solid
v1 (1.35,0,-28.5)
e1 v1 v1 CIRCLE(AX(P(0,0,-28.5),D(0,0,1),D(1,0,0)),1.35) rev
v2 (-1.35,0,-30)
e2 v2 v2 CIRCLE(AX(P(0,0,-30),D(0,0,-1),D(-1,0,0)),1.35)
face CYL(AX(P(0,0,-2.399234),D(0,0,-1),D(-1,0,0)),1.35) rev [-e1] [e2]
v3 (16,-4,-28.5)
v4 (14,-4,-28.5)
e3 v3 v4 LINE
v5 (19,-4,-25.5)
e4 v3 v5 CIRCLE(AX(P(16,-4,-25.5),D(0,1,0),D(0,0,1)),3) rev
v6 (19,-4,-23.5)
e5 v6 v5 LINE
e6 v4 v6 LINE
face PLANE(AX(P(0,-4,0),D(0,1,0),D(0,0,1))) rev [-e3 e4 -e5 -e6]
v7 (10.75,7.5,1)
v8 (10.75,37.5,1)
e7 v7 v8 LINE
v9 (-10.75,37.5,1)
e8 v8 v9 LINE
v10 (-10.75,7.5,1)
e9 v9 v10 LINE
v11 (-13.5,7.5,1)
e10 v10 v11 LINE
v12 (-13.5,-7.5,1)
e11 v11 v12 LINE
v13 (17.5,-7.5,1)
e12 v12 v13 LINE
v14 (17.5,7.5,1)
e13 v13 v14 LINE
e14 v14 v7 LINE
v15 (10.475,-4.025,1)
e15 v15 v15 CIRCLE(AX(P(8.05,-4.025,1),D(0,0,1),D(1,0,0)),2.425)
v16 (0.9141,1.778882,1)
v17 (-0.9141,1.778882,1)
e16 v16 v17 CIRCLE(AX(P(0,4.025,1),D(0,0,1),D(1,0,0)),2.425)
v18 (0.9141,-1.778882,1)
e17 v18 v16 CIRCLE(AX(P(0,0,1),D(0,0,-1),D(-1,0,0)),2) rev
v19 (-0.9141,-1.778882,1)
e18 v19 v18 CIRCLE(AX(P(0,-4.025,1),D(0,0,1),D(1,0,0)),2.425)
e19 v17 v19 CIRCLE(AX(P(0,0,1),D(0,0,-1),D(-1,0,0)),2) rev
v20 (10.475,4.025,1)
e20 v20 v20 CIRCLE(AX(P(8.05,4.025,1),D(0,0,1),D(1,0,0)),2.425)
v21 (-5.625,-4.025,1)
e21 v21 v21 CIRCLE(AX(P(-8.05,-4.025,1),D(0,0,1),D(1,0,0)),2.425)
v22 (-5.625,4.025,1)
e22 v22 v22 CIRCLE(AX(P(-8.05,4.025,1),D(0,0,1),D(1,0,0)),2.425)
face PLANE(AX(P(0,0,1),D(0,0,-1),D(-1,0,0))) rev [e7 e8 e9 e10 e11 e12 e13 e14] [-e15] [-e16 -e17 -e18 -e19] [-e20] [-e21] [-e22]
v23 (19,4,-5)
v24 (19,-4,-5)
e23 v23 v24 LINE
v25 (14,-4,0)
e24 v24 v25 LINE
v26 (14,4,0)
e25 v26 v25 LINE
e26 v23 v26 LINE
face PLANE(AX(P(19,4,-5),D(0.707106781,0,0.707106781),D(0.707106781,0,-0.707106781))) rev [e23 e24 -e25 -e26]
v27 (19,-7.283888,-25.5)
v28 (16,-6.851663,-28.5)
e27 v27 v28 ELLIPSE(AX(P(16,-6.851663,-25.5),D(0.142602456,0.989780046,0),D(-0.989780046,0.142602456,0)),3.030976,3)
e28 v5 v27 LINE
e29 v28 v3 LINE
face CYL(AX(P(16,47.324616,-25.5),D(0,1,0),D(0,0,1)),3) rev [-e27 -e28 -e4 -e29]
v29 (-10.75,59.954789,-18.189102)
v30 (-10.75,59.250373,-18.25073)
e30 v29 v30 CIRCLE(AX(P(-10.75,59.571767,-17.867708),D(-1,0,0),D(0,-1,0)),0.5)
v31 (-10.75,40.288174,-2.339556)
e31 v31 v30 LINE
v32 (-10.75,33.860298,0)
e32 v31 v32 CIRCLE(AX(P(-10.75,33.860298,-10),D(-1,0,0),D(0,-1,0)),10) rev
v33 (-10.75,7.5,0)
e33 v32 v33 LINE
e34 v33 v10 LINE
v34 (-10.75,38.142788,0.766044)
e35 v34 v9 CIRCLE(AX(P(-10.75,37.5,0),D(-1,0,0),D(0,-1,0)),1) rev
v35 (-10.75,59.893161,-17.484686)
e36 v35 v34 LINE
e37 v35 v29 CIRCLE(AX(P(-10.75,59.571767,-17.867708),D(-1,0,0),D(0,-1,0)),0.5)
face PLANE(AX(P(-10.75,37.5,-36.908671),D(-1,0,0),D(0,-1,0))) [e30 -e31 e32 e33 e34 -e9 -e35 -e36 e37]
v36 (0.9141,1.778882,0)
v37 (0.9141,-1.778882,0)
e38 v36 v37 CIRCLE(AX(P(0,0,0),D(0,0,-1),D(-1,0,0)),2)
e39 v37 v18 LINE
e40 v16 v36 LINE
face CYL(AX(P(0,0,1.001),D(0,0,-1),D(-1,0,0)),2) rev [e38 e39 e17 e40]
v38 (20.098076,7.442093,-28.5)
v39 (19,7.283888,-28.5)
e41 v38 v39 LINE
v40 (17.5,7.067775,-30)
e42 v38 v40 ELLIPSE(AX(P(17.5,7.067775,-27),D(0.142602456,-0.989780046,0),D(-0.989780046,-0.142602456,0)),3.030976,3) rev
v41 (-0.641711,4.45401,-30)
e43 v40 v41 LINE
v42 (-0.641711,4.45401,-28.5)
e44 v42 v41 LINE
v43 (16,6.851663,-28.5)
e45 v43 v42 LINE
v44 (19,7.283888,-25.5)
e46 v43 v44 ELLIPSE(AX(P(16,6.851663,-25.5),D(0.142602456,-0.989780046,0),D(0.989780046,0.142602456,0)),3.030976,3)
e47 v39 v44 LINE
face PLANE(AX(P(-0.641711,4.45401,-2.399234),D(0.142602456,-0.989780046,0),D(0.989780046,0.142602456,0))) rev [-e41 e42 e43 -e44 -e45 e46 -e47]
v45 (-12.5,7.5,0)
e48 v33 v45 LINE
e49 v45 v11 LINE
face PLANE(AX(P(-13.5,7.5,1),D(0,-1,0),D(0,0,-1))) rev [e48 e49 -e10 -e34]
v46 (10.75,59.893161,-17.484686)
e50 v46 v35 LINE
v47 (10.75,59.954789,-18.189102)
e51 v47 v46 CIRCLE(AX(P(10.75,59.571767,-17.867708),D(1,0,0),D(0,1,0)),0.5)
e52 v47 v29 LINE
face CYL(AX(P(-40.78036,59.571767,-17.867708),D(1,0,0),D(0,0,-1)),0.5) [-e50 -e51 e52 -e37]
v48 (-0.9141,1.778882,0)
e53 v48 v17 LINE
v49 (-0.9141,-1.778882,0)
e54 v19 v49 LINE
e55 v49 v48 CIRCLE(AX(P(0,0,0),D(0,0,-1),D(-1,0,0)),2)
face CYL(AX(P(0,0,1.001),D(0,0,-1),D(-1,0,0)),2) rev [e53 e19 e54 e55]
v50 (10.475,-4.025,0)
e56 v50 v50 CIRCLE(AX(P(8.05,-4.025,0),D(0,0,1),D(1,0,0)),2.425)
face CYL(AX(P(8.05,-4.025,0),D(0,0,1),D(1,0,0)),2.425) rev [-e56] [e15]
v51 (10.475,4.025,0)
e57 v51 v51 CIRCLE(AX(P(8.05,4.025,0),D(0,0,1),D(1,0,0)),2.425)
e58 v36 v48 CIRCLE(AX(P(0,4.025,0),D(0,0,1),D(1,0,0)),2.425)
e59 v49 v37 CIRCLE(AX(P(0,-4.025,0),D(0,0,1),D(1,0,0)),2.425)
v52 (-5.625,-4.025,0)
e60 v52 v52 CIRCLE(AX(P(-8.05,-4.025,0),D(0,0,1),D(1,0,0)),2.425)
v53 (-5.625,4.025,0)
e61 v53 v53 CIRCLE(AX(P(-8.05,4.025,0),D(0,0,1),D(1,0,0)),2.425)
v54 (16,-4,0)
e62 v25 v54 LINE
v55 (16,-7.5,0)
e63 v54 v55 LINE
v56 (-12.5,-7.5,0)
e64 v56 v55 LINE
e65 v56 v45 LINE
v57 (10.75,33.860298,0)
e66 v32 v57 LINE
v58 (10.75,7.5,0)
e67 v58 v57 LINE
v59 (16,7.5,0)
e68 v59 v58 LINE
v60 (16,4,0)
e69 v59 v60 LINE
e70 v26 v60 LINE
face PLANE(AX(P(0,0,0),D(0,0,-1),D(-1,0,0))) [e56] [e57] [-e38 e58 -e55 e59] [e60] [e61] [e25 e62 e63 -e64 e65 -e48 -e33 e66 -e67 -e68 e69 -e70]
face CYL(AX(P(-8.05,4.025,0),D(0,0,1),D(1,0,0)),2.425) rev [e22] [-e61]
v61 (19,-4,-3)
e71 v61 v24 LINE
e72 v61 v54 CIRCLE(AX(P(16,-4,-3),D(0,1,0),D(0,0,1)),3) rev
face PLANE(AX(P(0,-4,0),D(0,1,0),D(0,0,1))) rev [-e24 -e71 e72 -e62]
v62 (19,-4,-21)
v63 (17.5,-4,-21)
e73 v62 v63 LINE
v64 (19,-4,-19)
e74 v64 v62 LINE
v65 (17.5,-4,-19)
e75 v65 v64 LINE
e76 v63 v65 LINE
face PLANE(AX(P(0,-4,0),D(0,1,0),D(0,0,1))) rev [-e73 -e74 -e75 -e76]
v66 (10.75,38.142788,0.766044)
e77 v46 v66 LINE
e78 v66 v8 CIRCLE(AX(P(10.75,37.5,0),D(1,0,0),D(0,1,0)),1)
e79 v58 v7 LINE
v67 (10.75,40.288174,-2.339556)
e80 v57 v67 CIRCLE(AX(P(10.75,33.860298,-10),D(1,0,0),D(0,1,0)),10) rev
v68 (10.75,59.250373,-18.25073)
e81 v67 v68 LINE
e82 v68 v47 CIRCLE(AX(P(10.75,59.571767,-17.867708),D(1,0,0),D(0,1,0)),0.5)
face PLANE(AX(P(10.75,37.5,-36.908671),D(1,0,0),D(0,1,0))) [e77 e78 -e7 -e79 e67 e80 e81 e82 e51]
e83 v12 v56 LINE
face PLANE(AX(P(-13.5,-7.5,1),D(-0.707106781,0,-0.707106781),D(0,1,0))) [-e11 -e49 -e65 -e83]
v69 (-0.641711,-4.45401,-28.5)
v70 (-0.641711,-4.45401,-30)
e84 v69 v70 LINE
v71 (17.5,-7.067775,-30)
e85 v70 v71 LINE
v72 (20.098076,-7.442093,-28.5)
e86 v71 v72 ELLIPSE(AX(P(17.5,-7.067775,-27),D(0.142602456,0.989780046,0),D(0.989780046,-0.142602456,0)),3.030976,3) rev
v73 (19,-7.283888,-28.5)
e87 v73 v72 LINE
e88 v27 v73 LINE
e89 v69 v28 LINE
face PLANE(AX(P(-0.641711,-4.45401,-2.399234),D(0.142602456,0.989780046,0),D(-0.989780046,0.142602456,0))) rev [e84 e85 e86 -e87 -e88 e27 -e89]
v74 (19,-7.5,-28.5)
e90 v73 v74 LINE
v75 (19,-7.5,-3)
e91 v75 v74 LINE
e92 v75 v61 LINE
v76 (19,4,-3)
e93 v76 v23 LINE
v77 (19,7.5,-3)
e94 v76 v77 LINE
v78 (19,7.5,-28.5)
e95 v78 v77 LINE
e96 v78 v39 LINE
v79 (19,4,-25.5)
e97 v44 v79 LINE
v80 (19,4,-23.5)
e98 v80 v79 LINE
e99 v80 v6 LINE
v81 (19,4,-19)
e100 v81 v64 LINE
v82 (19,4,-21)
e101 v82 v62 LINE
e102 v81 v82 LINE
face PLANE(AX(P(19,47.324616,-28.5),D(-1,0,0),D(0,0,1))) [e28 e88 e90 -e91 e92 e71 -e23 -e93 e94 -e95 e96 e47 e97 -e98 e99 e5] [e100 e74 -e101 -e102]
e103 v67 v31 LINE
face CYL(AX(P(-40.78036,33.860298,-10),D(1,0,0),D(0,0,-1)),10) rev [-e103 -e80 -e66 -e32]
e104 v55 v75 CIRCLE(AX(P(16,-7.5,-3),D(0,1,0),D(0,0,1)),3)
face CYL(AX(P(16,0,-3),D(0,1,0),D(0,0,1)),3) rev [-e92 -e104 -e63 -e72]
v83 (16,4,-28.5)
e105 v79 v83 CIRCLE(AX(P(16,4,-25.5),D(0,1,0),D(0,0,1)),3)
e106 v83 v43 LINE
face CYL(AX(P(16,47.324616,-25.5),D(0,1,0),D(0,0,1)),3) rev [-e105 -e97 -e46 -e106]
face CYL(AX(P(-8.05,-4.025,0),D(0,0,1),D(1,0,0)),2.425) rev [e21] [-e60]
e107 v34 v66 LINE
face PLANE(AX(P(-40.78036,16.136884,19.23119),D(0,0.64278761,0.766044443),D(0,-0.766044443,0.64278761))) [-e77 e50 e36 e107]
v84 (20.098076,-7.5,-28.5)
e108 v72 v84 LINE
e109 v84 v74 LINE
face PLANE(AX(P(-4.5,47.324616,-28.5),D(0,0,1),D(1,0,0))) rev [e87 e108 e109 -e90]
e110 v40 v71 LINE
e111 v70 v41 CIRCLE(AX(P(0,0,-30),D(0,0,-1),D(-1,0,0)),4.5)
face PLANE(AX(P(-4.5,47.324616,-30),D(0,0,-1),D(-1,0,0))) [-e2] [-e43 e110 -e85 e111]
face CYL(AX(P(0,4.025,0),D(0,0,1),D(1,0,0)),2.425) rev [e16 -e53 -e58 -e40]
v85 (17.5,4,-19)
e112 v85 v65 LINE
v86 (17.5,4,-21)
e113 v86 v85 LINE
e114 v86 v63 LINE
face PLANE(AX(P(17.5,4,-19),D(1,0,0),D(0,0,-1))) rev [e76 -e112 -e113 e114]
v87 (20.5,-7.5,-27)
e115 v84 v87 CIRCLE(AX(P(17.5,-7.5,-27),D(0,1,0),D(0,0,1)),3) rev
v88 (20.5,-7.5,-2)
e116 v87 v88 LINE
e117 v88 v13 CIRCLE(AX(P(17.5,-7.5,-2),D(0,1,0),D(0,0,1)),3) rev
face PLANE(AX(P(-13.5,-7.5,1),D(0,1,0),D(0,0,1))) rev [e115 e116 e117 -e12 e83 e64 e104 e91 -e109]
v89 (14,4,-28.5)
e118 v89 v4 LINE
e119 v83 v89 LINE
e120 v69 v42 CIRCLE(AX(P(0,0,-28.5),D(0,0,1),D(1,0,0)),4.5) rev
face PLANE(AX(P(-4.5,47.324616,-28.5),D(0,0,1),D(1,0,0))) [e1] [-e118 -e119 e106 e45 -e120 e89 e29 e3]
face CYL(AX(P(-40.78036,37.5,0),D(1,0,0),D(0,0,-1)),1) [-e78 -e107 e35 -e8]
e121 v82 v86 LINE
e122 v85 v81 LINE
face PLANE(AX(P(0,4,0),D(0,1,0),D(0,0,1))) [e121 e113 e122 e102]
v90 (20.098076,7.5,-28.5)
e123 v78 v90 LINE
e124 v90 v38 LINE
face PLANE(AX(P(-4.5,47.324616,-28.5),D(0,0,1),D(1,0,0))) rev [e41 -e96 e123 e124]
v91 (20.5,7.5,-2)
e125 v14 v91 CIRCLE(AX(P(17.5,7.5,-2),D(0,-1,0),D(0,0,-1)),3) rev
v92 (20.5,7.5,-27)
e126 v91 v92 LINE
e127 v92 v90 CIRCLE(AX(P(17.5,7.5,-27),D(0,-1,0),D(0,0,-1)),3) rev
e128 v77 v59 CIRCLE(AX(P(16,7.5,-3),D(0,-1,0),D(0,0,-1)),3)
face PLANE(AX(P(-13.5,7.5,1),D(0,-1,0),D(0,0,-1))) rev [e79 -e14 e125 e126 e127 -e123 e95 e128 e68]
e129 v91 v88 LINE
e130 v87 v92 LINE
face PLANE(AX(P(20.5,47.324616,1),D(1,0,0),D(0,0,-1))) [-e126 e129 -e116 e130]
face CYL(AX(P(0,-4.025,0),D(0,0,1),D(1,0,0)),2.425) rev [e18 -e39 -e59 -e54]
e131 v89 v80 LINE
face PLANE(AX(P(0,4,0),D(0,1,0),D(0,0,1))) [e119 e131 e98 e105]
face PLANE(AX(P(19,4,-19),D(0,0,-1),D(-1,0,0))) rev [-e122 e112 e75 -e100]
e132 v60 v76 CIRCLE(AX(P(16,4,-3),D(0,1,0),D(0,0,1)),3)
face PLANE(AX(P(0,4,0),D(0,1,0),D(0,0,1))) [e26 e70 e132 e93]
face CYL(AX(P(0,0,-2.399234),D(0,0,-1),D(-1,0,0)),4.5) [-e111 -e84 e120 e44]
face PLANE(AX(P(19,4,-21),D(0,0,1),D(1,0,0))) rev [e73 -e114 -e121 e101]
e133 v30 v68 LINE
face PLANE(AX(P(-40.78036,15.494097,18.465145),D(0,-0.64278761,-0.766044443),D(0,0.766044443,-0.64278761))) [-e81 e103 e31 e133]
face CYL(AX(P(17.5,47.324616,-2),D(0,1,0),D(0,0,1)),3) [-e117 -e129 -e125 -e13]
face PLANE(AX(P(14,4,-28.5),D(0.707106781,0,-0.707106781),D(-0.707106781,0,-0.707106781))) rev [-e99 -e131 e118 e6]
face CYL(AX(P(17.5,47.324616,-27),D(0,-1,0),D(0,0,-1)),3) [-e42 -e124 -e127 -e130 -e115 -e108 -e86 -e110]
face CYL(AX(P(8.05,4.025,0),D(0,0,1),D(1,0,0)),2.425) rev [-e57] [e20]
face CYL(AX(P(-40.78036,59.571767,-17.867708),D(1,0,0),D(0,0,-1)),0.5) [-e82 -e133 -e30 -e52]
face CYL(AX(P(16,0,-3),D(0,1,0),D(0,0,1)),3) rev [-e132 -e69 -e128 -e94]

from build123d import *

# Parameters (mm, degrees)
SKETCH_1_W                  = 27
SKETCH_1_H                  = 15
EXTRUDE_1_DEPTH             = 1
SKETCH_2_R                  = 2.425
CUT_EXTRUDE_1_DEPTH         = 16.475787541
EXTRUDE_2_DEPTH             = 15
SKETCH_6_W                  = 1.5
SKETCH_6_H                  = 2
EXTRUDE_3_DEPTH             = 4
SKETCH_7_R                  = 1.35
CUT_EXTRUDE_3_DEPTH         = 1.5
FILLET_1_R                  = 3
CHAMFER_1_SIZE              = 1
CUT_EXTRUDE_4_REACH         = 39.101
SKETCH_8_R                  = 2
SKETCH_9_W                  = 21.5
SKETCH_9_H                  = 30
EXTRUDE_4_DEPTH             = 1
EXTRUDE_5_REACH             = 54.216
EXTRUDE_5_DIRECTION_2_REACH = 54.216
FILLET_2_R                  = 10
FILLET_3_R                  = 0.5


# Some blends are built 0.0001 mm under size
with BuildPart() as part:
    # 草图1 → 凸台-拉伸1 (new body)
    with BuildSketch(Plane.XY):
        Rectangle(SKETCH_1_W, SKETCH_1_H)
    extrude(amount=EXTRUDE_1_DEPTH)

    # 草图2 → 切除-拉伸1 (cut, through all)
    with BuildSketch(Plane.XY.offset(1)):
        with Locations((0, 4.025)):
            Circle(SKETCH_2_R)
        with Locations((0, -4.025)):
            Circle(SKETCH_2_R)
        with Locations((8.05, 4.025)):
            Circle(SKETCH_2_R)
        with Locations((8.05, -4.025)):
            Circle(SKETCH_2_R)
        with Locations((-8.05, 4.025)):
            Circle(SKETCH_2_R)
        with Locations((-8.05, -4.025)):
            Circle(SKETCH_2_R)
    extrude(amount=-CUT_EXTRUDE_1_DEPTH, mode=Mode.SUBTRACT)

    # 草图3 → 凸台-拉伸2 (add)
    with BuildSketch(Plane.XZ.offset(7.5)):
        Polygon((13.5, 0), (19, 0), (19, -28.5), (-4.5, -28.5), (-4.5, -30), (20.5, -30), (20.5, 1), (13.5, 1), align=None)
    extrude(amount=-EXTRUDE_2_DEPTH)

    # 草图6 → 凸台-拉伸3 (add, symmetric)
    with BuildSketch(Plane(origin=(0, 0, 0), x_dir=(1, 0, 0), z_dir=(0, 1, 0))):
        Polygon((19, 0), (19, 5), (14, 0), align=None)
        Polygon((19, 28.5), (14, 28.5), (19, 23.5), align=None)
        with Locations((18.25, 20)):
            Rectangle(SKETCH_6_W, SKETCH_6_H)
    extrude(amount=EXTRUDE_3_DEPTH, both=True)

    # 草图7 → 切除-拉伸3 (cut)
    with BuildSketch(Plane(origin=(0, 0, -30), x_dir=(-1, 0, 0), z_dir=(0, 0, -1))):
        with BuildLine():
            ThreePointArc((4.5, 0), (3.401301202, -2.946379157), (0.641711051, -4.454010207))
            Line((0.641711051, -4.454010207), (-20.5, -7.5))
            Line((-20.5, -7.5), (4.5, -7.5))
            Line((4.5, -7.5), (4.5, 0))
        make_face()
        with BuildLine():
            Line((-20.5, 7.5), (0.641711051, 4.454010207))
            ThreePointArc((0.641711051, 4.454010207), (3.401301202, 2.946379157), (4.5, 0))
            Line((4.5, 0), (4.5, 7.5))
            Line((4.5, 7.5), (-20.5, 7.5))
        make_face()
        Circle(SKETCH_7_R)
    extrude(amount=-CUT_EXTRUDE_3_DEPTH, mode=Mode.SUBTRACT)

    # 圆角1
    # the kernel refuses this fillet: 3 mm, written as the material it adds along each edge
    with BuildSketch(Plane(origin=(19, -3.5, -28.5), x_dir=(-1, 0, 0), z_dir=(0, 1, 0))) as fillet_1_piece_1_section:
        with BuildLine():
            CenterArc((FILLET_1_R, FILLET_1_R), FILLET_1_R, 180, 90)
            Line((0, FILLET_1_R), (0, 0))
            Line((0, 0), (FILLET_1_R, 0))
        make_face()
    fillet_1_piece_1 = extrude(amount=18.283887658, mode=Mode.PRIVATE)
    fillet_1_piece_1 = split(fillet_1_piece_1, bisect_by=Plane(origin=(18.119115161, 7.156974268, -27.821481802), z_dir=(0.1426024558755584, -0.9897800460598605, 0)), keep=Keep.TOP, mode=Mode.PRIVATE)
    add(fillet_1_piece_1)
    with BuildSketch(Plane(origin=(19, -3.5, 0), x_dir=(0, 0, -1), z_dir=(0, 1, 0)), Plane(origin=(19, -7.5, 0), x_dir=(0, 0, -1), z_dir=(0, 1, 0))) as fillet_1_piece_2:
        with BuildLine():
            CenterArc((FILLET_1_R, FILLET_1_R), FILLET_1_R, 180, 90)
            Line((0, FILLET_1_R), (0, 0))
            Line((0, 0), (FILLET_1_R, 0))
        make_face()
    extrude(amount=11)
    with BuildSketch(Plane(origin=(19, -14.783887658, -28.5), x_dir=(-1, 0, 0), z_dir=(0, 1, 0))) as fillet_1_piece_3_section:
        with BuildLine():
            CenterArc((FILLET_1_R, FILLET_1_R), FILLET_1_R, 180, 90)
            Line((0, FILLET_1_R), (0, 0))
            Line((0, 0), (FILLET_1_R, 0))
        make_face()
    fillet_1_piece_3 = extrude(amount=18.283887658, mode=Mode.PRIVATE)
    fillet_1_piece_3 = split(fillet_1_piece_3, bisect_by=Plane(origin=(18.119115161, -7.156974268, -27.821481802), z_dir=(0.1426024558755584, 0.9897800460598605, 0)), keep=Keep.TOP, mode=Mode.PRIVATE)
    add(fillet_1_piece_3)
    # the kernel refuses this fillet: 3 mm, written as the material it takes off along each edge
    with BuildSketch(Plane(origin=(20.5, -15, 1), x_dir=(0, 0, -1), z_dir=(0, 1, 0))) as fillet_1_2_piece_1:
        with BuildLine():
            CenterArc((FILLET_1_R, FILLET_1_R), FILLET_1_R, 180, 90)
            Line((0, FILLET_1_R), (0, 0))
            Line((0, 0), (FILLET_1_R, 0))
        make_face()
    extrude(amount=30, mode=Mode.SUBTRACT)
    with BuildSketch(Plane(origin=(20.5, -15, -30), x_dir=(0, 0, 1), z_dir=(0, 1, 0))) as fillet_1_2_piece_2:
        with BuildLine():
            CenterArc((FILLET_1_R, -FILLET_1_R), FILLET_1_R, 90, 90)
            Line((0, -FILLET_1_R), (0, 0))
            Line((0, 0), (FILLET_1_R, 0))
        make_face()
    extrude(amount=30, mode=Mode.SUBTRACT)

    # 倒角1
    chamfer_1_edges = [part.edges().sort_by_distance(p)[0] for p in [
        (-13.5, 0, 0),
    ]]
    chamfer(chamfer_1_edges, length=CHAMFER_1_SIZE - 0.0001)  # a hair under: the kernel refuses the full size

    # 草图8 → 切除-拉伸4 (cut, up to next)
    with BuildSketch(Plane(origin=(0, 0, 0), x_dir=(-1, 0, 0), z_dir=(0, 0, -1)), mode=Mode.PRIVATE) as cut_extrude_4_sk1:
        Circle(SKETCH_8_R)
    cut_extrude_4_tool1 = extrude(cut_extrude_4_sk1.sketch, amount=-CUT_EXTRUDE_4_REACH, mode=Mode.PRIVATE) & part.part
    add(cut_extrude_4_tool1.solids().sort_by_distance((0, 0, 0))[0], mode=Mode.SUBTRACT)

    # 草图9 → 凸台-拉伸4 (add)
    with BuildSketch(Plane.XY.offset(1)):
        with Locations((0, 22.5)):
            Rectangle(SKETCH_9_W, SKETCH_9_H)
    extrude(amount=-EXTRUDE_4_DEPTH)

    # 凸台-拉伸5: up to this face of the body (flat: up to its plane)
    extrude_5_end = Plane(part.part.faces().sort_by_distance((-10.75, 22.5, 0.5))[0])
    # 草图10 → 凸台-拉伸5 (add, up to the picked face)
    with BuildSketch(Plane(origin=(0, 0, 0), x_dir=(0, 0, -1), z_dir=(1, 0, 0)), mode=Mode.PRIVATE) as extrude_5_sk1:
        with BuildLine():
            Line((-1, 37.5), (0, 37.5))
            Line((0, 37.5), (18.572123903, 59.633395384))
            Line((18.572123903, 59.633395384), (17.80607946, 60.276182993))
            Line((17.80607946, 60.276182993), (-0.766044443, 38.14278761))
            ThreePointArc((-0.766044443, 38.14278761), (-0.939692621, 37.842020143), (-1, 37.5))
        make_face()
    extrude_5_tool1 = split(extrude(extrude_5_sk1.sketch, amount=-EXTRUDE_5_REACH, mode=Mode.PRIVATE), bisect_by=extrude_5_end, keep=Keep.BOTH, mode=Mode.PRIVATE)
    add(extrude_5_tool1.solids().sort_by(Axis((0, 48.754818, -8.789436), (-1, 0, 0)))[0])

    # 凸台-拉伸5 direction 2: up to this face of the body (flat: up to its plane)
    extrude_5_direction_2_end = Plane(part.part.faces().sort_by_distance((10.75, 22.5, 0.5))[0])
    # 草图10 → 凸台-拉伸5 direction 2 (add, up to the picked face)
    with BuildSketch(Plane(origin=(0, 0, 0), x_dir=(0, 0, -1), z_dir=(1, 0, 0)), mode=Mode.PRIVATE) as extrude_5_direction_2_sk1:
        with BuildLine():
            Line((-1, 37.5), (0, 37.5))
            Line((0, 37.5), (18.572123903, 59.633395384))
            Line((18.572123903, 59.633395384), (17.80607946, 60.276182993))
            Line((17.80607946, 60.276182993), (-0.766044443, 38.14278761))
            ThreePointArc((-0.766044443, 38.14278761), (-0.939692621, 37.842020143), (-1, 37.5))
        make_face()
    extrude_5_direction_2_tool1 = split(extrude(extrude_5_direction_2_sk1.sketch, amount=EXTRUDE_5_DIRECTION_2_REACH, mode=Mode.PRIVATE), bisect_by=extrude_5_direction_2_end, keep=Keep.BOTH, mode=Mode.PRIVATE)
    add(extrude_5_direction_2_tool1.solids().sort_by(Axis((0, 48.754818, -8.789436), (1, 0, 0)))[0])

    # 圆角2
    fillet_2_edges = [part.edges().sort_by_distance(p)[0] for p in [
        (0, 37.5, 0),
    ]]
    fillet(fillet_2_edges, radius=FILLET_2_R)

    # 圆角3
    fillet_3_edges = [part.edges().sort_by_distance(p)[0] for p in [
        (0, 60.276182993, -17.80607946),
        (0, 59.633395384, -18.572123903),
    ]]
    fillet(fillet_3_edges, radius=FILLET_3_R - 0.0001)  # a hair under: the kernel refuses the full size


solid = part.part
